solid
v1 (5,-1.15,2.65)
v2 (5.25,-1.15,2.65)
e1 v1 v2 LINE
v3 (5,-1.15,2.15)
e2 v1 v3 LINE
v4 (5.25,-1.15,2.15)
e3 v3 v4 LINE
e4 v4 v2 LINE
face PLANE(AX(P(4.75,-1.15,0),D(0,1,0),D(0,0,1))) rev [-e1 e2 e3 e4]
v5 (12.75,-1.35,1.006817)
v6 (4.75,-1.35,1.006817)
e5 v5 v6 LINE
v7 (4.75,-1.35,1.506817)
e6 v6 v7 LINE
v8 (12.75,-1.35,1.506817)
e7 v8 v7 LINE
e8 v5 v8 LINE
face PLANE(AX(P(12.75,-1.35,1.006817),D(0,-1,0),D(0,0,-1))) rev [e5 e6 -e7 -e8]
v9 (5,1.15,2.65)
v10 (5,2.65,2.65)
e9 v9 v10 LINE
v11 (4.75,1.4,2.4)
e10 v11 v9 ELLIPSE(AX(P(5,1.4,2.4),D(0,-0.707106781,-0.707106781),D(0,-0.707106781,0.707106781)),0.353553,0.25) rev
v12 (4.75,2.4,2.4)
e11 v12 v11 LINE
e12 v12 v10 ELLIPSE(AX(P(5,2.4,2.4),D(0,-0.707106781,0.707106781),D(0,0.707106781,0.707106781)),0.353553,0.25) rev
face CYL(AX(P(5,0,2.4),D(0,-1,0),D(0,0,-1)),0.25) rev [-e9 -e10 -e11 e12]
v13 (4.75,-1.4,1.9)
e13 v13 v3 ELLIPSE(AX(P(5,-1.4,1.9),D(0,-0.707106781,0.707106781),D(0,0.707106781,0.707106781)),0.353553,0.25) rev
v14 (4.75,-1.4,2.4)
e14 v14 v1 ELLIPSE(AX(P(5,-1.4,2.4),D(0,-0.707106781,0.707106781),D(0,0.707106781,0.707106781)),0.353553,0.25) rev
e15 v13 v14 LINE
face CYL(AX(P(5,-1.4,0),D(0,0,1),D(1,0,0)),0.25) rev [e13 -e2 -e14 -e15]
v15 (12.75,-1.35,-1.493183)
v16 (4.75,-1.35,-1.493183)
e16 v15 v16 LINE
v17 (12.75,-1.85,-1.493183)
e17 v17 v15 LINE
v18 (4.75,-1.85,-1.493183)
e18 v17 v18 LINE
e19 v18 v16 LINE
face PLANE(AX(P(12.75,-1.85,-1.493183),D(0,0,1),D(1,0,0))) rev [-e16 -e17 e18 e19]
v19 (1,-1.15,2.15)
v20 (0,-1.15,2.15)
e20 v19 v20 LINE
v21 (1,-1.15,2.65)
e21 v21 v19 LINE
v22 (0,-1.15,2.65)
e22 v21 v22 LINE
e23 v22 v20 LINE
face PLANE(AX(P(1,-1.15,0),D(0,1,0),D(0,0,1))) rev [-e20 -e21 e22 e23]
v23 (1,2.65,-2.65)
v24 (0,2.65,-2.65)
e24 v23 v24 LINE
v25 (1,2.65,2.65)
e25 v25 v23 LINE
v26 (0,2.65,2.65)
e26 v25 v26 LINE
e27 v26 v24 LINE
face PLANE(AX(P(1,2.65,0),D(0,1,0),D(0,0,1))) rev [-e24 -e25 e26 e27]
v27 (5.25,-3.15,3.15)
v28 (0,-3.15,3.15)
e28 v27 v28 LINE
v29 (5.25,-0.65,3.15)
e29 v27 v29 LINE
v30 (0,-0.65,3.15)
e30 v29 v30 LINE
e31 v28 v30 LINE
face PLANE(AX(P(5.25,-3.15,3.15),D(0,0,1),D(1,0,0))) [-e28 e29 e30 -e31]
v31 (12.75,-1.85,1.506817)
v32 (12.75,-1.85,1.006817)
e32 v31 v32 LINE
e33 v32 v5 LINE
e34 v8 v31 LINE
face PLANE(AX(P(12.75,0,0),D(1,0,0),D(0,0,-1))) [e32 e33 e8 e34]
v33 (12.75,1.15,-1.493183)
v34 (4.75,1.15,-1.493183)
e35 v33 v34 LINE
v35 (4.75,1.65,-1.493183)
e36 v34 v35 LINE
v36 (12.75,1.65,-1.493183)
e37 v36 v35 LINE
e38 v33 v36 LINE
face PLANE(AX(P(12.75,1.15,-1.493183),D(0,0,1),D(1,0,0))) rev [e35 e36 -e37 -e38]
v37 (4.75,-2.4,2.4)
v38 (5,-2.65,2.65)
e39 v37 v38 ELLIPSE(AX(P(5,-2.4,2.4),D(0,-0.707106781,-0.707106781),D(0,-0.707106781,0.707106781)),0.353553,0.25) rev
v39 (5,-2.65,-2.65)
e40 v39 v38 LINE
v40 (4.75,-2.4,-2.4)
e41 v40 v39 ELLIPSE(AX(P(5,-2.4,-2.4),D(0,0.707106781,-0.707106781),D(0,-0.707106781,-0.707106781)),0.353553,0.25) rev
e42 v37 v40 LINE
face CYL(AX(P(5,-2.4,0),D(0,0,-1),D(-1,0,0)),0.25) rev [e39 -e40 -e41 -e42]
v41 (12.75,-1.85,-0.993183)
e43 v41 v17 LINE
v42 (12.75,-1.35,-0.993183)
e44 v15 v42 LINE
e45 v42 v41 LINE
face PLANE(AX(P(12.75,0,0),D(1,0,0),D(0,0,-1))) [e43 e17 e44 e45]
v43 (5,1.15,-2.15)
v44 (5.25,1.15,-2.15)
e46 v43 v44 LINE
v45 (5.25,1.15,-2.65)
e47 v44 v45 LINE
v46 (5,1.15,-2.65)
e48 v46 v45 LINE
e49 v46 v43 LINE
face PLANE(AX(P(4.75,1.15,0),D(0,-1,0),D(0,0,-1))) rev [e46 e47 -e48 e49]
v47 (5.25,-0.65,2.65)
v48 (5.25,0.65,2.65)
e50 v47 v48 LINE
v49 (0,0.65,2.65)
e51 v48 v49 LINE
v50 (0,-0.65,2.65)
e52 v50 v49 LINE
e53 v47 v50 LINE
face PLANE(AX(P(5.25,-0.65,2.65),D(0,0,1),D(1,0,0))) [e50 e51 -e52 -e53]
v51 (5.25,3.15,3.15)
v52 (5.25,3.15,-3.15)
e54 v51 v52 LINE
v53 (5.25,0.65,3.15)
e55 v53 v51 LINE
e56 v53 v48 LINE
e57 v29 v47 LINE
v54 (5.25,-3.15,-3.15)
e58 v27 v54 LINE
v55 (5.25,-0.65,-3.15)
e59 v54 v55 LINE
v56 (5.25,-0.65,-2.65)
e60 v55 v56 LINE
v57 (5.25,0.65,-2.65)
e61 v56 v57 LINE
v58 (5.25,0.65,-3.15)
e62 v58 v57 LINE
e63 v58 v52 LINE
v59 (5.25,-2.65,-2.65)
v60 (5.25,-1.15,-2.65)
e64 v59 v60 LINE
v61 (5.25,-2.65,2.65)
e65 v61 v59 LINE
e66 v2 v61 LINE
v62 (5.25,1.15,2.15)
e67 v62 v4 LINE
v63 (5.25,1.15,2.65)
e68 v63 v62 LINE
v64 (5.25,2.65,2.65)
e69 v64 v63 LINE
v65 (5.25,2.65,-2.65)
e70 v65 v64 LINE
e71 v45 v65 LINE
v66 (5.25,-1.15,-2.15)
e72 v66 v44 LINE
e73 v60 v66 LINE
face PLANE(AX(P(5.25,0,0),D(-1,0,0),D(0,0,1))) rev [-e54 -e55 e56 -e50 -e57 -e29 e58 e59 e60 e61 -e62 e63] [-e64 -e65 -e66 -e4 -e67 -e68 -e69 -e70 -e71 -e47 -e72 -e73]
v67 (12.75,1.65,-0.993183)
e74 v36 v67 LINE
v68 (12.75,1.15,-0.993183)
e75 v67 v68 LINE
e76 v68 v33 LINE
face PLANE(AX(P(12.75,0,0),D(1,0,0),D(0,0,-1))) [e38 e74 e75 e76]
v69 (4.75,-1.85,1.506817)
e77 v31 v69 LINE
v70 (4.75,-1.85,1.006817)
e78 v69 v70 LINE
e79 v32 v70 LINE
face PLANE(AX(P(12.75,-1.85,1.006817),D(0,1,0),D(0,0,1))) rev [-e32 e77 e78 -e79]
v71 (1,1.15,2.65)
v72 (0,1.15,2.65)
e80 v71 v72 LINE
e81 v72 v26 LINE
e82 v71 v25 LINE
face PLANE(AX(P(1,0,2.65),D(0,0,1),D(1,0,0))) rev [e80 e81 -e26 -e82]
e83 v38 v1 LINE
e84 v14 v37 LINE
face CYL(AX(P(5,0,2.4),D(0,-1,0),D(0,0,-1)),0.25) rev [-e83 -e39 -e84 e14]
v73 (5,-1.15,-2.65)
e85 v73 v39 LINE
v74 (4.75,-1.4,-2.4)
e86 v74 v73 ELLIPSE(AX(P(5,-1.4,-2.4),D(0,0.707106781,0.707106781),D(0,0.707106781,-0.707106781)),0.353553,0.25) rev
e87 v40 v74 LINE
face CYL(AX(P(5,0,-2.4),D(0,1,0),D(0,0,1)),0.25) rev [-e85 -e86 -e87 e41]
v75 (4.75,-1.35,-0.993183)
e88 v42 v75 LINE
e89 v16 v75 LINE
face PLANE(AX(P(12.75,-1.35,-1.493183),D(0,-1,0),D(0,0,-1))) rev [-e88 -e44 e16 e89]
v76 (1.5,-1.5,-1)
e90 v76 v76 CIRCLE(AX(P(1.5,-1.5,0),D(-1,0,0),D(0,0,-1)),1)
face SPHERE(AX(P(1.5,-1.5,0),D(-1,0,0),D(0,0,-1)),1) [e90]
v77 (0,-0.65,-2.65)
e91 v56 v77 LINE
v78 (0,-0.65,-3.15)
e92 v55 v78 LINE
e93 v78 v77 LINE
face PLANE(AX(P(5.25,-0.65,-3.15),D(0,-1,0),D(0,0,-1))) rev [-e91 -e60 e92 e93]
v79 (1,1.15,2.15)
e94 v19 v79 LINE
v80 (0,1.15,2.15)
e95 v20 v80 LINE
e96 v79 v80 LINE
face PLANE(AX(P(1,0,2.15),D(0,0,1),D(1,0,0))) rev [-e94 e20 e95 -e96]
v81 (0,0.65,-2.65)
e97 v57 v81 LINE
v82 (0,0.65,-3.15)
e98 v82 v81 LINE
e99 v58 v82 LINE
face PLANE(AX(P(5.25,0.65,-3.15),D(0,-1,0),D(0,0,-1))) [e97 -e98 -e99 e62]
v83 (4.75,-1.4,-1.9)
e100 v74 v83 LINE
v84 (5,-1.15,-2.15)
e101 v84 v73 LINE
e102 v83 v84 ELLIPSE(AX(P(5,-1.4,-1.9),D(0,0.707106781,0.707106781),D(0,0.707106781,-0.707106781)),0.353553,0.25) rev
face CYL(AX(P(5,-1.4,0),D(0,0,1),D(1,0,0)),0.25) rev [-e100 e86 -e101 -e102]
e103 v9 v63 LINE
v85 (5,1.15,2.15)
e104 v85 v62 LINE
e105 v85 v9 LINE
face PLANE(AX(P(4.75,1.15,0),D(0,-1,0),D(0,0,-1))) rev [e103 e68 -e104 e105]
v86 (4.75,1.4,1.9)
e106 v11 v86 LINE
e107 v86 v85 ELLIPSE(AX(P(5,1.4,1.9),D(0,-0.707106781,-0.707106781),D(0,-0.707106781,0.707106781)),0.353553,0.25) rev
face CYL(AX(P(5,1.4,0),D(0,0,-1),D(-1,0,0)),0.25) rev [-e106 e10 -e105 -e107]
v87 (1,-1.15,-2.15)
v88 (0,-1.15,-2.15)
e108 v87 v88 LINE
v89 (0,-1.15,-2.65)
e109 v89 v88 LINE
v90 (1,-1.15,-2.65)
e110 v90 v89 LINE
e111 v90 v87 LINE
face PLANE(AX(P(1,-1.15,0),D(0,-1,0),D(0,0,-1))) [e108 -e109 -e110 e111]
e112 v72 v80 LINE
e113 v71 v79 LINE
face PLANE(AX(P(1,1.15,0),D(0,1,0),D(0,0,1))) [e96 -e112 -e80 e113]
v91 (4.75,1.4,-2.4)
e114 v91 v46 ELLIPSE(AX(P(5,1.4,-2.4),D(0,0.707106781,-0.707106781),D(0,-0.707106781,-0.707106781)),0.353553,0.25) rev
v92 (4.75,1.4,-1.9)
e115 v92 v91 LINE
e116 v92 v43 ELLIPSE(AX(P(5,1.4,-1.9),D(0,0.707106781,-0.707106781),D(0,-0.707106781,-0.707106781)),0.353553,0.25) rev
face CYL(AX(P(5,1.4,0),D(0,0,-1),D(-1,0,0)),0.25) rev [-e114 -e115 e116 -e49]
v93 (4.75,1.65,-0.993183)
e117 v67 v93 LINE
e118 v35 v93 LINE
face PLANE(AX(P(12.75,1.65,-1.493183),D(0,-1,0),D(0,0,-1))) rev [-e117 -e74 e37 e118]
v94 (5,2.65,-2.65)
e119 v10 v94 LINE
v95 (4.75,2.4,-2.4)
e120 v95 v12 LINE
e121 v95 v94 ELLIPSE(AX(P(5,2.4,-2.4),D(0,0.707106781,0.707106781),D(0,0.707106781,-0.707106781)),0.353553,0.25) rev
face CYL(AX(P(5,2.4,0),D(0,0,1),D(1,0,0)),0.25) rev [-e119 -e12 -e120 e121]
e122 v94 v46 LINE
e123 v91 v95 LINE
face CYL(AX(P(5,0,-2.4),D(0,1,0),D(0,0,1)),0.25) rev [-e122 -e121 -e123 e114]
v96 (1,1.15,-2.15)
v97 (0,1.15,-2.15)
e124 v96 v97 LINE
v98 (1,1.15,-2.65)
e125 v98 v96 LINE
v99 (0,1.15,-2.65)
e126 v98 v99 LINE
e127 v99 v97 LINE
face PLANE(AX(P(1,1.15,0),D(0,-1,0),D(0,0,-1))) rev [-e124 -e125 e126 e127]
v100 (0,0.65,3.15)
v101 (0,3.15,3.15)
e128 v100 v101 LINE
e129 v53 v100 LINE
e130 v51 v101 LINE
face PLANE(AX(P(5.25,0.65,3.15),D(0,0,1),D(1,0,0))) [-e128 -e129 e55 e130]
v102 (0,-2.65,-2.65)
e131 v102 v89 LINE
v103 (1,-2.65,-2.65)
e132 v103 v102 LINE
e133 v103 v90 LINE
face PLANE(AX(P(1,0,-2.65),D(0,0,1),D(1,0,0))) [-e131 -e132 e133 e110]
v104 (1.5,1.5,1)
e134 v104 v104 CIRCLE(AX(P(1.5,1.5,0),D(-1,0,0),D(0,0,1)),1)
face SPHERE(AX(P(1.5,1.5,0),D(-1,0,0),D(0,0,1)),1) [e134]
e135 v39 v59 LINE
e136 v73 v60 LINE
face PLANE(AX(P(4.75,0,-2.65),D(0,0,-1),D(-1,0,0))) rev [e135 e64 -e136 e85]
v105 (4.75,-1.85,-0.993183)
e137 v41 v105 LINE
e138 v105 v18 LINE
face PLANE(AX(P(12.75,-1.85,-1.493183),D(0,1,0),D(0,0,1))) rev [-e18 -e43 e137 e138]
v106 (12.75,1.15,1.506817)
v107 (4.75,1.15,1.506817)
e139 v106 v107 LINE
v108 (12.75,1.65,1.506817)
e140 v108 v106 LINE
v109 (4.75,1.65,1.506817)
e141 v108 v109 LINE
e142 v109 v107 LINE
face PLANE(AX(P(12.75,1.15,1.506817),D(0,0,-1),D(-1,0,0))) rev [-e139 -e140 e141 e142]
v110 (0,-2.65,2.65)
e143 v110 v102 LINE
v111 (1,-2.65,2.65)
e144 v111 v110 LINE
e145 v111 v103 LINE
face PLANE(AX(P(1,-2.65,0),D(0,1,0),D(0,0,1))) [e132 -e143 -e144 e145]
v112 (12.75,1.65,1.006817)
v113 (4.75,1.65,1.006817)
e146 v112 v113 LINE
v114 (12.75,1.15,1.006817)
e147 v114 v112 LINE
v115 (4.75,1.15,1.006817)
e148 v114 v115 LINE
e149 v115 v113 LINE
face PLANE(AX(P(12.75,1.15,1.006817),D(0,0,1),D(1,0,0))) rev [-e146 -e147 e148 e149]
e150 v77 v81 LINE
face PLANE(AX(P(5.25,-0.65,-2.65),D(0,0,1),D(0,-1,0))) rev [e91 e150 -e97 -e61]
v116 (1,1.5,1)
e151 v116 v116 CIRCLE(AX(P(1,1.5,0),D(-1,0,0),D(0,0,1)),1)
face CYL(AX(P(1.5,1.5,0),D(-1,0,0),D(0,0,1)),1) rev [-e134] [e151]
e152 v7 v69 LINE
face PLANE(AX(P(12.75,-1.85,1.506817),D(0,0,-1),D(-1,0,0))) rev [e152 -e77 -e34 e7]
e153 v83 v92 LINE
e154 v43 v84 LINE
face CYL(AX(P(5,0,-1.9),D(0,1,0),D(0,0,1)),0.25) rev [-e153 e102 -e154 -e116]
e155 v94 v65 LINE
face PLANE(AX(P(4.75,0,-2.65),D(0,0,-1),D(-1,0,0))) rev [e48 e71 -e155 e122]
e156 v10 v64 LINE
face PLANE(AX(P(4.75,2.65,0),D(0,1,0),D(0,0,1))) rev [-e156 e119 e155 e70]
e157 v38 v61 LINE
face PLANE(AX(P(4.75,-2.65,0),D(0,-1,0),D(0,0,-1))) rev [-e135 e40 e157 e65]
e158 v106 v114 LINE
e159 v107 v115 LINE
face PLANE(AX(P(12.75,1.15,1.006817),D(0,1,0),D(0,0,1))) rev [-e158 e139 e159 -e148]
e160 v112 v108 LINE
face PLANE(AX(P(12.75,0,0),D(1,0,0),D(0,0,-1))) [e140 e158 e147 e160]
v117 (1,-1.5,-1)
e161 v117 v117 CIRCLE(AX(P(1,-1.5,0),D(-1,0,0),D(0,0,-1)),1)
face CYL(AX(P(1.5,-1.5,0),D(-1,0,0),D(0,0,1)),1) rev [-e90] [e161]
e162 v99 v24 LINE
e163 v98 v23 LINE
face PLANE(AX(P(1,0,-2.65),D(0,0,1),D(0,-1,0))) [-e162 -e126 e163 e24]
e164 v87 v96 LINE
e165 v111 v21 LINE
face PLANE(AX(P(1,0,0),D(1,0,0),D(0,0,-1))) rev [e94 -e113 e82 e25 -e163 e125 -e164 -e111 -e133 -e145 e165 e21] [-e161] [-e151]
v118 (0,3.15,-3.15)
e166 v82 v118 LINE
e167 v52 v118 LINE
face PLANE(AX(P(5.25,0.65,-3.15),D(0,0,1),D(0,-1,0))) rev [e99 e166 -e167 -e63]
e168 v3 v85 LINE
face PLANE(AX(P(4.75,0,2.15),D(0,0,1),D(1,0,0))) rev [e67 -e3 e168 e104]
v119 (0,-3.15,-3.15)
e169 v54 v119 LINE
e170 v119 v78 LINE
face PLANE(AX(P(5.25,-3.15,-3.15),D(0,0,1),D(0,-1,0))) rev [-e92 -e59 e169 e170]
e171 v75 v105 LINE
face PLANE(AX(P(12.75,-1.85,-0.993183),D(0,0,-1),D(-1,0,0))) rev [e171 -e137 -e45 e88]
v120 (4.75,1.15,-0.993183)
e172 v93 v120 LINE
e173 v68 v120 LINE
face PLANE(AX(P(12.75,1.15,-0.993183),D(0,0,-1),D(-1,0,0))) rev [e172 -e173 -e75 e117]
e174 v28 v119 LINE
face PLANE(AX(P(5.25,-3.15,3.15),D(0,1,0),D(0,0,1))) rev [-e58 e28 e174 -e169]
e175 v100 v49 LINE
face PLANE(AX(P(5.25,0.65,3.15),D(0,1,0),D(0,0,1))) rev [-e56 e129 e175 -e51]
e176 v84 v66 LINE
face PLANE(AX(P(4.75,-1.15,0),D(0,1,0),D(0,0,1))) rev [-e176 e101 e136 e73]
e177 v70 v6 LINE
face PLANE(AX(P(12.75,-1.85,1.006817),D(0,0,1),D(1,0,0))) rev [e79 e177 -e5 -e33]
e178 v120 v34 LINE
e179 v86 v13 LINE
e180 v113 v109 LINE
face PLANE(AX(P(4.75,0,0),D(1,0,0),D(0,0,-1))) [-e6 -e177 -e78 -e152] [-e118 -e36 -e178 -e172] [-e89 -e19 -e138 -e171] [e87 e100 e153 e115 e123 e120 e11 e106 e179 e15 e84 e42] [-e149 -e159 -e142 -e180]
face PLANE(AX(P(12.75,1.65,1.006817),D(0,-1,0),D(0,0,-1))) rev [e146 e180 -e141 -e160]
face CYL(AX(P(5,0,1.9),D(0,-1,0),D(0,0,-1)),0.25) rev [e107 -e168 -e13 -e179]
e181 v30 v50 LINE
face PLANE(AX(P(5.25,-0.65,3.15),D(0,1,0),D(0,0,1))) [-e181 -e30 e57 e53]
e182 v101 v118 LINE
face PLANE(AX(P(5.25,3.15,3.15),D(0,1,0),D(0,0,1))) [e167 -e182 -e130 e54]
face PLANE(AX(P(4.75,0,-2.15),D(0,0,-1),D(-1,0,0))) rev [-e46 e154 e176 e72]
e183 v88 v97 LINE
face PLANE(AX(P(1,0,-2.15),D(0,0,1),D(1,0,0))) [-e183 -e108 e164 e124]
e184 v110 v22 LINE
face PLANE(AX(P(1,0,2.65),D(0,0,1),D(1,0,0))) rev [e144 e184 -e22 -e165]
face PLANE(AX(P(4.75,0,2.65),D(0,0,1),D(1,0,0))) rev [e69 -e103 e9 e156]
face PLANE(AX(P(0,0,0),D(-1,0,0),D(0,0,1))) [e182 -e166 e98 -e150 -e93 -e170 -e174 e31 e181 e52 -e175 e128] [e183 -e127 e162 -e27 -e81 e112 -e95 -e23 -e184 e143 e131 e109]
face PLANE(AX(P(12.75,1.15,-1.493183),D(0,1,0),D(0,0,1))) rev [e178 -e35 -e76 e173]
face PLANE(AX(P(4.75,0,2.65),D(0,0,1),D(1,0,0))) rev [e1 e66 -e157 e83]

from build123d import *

# Parameters (mm, degrees)
SALIENTE_EXTRUIR1_DEPTH = 5.25
CORTAR_EXTRUIR1_DEPTH   = 1
CORTAR_EXTRUIR2_DEPTH   = 0.5
REDONDEO1_R             = 0.25
CROQUIS4_W              = 0.5
CROQUIS4_H              = 0.5
SALIENTE_EXTRUIR2_DEPTH = 8
CROQUIS5_R              = 1
CORTAR_EXTRUIR3_DEPTH   = 0.5
C_PULA1_FACE_RADIUS     = 1
C_PULA1_HEIGHT          = 1


# Read off the part's stored shape, not the designer's step: Cúpula2
with BuildPart() as part:
    # Croquis2 → Saliente-Extruir1 (new body)
    with BuildSketch(Plane(origin=(0, 0, 0), x_dir=(0, 0, -1), z_dir=(1, 0, 0))):
        Polygon((-3.15, -3.15), (3.15, -3.15), (3.15, -0.65), (2.65, -0.65), (2.65, 0.65), (3.15, 0.65), (3.15, 3.15), (-3.15, 3.15), (-3.15, 0.65), (-2.65, 0.65), (-2.65, -0.65), (-3.15, -0.65), align=None)
    extrude(amount=SALIENTE_EXTRUIR1_DEPTH)

    # Croquis2<4> → Cortar-Extruir1 (cut)
    with BuildSketch(Plane(origin=(0, 0, 0), x_dir=(0, 0, -1), z_dir=(1, 0, 0))):
        Polygon((-2.65, -2.65), (-2.65, -1.15), (-2.15, -1.15), (-2.15, 1.15), (-2.65, 1.15), (-2.65, 2.65), (2.65, 2.65), (2.65, 1.15), (2.15, 1.15), (2.15, -1.15), (2.65, -1.15), (2.65, -2.65), align=None)
    extrude(amount=CORTAR_EXTRUIR1_DEPTH, mode=Mode.SUBTRACT)

    # Croquis3 → Cortar-Extruir2 (cut)
    with BuildSketch(Plane(origin=(5.25, 0, 0), x_dir=(0, 0, -1), z_dir=(1, 0, 0))):
        Polygon((2.65, 1.15), (2.65, 2.65), (-2.65, 2.65), (-2.65, 1.15), (-2.15, 1.15), (-2.15, -1.15), (-2.65, -1.15), (-2.65, -2.65), (2.65, -2.65), (2.65, -1.15), (2.15, -1.15), (2.15, 1.15), align=None)
    extrude(amount=-CORTAR_EXTRUIR2_DEPTH, mode=Mode.SUBTRACT)

    # Redondeo1
    redondeo1_edges = [part.edges().sort_by_distance(p)[0] for p in [
        (4.75, 1.9, -2.65),
        (4.75, 1.15, -2.4),
        (4.75, 0, -2.15),
        (4.75, -1.15, -2.4),
        (4.75, -1.9, -2.65),
        (4.75, -2.65, 0),
        (4.75, -1.9, 2.65),
        (4.75, -1.15, 2.4),
        (4.75, 0, 2.15),
        (4.75, 1.15, 2.4),
        (4.75, 1.9, 2.65),
        (4.75, 2.65, 0),
    ]]
    fillet(redondeo1_edges, radius=REDONDEO1_R)

    # Croquis4 → Saliente-Extruir2 (add)
    with BuildSketch(Plane(origin=(4.75, 0, 0), x_dir=(0, 0, -1), z_dir=(1, 0, 0))):
        with Locations((-1.256816684, 1.4)):
            Rectangle(CROQUIS4_W, CROQUIS4_H)
        with Locations((1.243183316, 1.4)):
            Rectangle(CROQUIS4_W, CROQUIS4_H)
        with Locations((1.243183316, -1.6)):
            Rectangle(CROQUIS4_W, CROQUIS4_H)
        with Locations((-1.256816684, -1.6)):
            Rectangle(CROQUIS4_W, CROQUIS4_H)
    extrude(amount=SALIENTE_EXTRUIR2_DEPTH)

    # Croquis5 → Cortar-Extruir3 (cut)
    with BuildSketch(Plane.ZY.offset(-1)):
        with Locations((0, 1.5)):
            Circle(CROQUIS5_R)
        with Locations(Location((0, -1.5, 0), (0, 0, 180))):
            Circle(CROQUIS5_R)
    extrude(amount=-CORTAR_EXTRUIR3_DEPTH, mode=Mode.SUBTRACT)

    # Cúpula1: a dome of height H over a round flat face of radius A is a cap of a sphere of radius (A * A + H * H) / (2 * H)
    c_pula1_r = (C_PULA1_FACE_RADIUS * C_PULA1_FACE_RADIUS + C_PULA1_HEIGHT * C_PULA1_HEIGHT) / (2 * C_PULA1_HEIGHT)
    c_pula1_base = Plane((1.5, 1.5, 0), z_dir=(-1, 0, 0))
    with Locations(c_pula1_base.offset(C_PULA1_HEIGHT - c_pula1_r)):
        c_pula1_ball = Sphere(c_pula1_r, mode=Mode.PRIVATE)
    add(split(c_pula1_ball, bisect_by=c_pula1_base, keep=Keep.TOP, mode=Mode.PRIVATE))

    # Cúpula2 outline → Cúpula2 (revolve)
    with BuildSketch(Plane(origin=(0, -1.5, 0), x_dir=(0, 1, 0), z_dir=(0, 0, -1))):
        with BuildLine():
            Line((0, 1.500000001), (0, 0.5))
            ThreePointArc((0, 0.5), (0.707106782, 0.792893219), (1, 1.500000001))
            Line((1, 1.500000001), (0, 1.500000001))
        make_face()
    revolve(axis=Axis((0, -1.5, 0), (1, 0, 0)))


solid = part.part
